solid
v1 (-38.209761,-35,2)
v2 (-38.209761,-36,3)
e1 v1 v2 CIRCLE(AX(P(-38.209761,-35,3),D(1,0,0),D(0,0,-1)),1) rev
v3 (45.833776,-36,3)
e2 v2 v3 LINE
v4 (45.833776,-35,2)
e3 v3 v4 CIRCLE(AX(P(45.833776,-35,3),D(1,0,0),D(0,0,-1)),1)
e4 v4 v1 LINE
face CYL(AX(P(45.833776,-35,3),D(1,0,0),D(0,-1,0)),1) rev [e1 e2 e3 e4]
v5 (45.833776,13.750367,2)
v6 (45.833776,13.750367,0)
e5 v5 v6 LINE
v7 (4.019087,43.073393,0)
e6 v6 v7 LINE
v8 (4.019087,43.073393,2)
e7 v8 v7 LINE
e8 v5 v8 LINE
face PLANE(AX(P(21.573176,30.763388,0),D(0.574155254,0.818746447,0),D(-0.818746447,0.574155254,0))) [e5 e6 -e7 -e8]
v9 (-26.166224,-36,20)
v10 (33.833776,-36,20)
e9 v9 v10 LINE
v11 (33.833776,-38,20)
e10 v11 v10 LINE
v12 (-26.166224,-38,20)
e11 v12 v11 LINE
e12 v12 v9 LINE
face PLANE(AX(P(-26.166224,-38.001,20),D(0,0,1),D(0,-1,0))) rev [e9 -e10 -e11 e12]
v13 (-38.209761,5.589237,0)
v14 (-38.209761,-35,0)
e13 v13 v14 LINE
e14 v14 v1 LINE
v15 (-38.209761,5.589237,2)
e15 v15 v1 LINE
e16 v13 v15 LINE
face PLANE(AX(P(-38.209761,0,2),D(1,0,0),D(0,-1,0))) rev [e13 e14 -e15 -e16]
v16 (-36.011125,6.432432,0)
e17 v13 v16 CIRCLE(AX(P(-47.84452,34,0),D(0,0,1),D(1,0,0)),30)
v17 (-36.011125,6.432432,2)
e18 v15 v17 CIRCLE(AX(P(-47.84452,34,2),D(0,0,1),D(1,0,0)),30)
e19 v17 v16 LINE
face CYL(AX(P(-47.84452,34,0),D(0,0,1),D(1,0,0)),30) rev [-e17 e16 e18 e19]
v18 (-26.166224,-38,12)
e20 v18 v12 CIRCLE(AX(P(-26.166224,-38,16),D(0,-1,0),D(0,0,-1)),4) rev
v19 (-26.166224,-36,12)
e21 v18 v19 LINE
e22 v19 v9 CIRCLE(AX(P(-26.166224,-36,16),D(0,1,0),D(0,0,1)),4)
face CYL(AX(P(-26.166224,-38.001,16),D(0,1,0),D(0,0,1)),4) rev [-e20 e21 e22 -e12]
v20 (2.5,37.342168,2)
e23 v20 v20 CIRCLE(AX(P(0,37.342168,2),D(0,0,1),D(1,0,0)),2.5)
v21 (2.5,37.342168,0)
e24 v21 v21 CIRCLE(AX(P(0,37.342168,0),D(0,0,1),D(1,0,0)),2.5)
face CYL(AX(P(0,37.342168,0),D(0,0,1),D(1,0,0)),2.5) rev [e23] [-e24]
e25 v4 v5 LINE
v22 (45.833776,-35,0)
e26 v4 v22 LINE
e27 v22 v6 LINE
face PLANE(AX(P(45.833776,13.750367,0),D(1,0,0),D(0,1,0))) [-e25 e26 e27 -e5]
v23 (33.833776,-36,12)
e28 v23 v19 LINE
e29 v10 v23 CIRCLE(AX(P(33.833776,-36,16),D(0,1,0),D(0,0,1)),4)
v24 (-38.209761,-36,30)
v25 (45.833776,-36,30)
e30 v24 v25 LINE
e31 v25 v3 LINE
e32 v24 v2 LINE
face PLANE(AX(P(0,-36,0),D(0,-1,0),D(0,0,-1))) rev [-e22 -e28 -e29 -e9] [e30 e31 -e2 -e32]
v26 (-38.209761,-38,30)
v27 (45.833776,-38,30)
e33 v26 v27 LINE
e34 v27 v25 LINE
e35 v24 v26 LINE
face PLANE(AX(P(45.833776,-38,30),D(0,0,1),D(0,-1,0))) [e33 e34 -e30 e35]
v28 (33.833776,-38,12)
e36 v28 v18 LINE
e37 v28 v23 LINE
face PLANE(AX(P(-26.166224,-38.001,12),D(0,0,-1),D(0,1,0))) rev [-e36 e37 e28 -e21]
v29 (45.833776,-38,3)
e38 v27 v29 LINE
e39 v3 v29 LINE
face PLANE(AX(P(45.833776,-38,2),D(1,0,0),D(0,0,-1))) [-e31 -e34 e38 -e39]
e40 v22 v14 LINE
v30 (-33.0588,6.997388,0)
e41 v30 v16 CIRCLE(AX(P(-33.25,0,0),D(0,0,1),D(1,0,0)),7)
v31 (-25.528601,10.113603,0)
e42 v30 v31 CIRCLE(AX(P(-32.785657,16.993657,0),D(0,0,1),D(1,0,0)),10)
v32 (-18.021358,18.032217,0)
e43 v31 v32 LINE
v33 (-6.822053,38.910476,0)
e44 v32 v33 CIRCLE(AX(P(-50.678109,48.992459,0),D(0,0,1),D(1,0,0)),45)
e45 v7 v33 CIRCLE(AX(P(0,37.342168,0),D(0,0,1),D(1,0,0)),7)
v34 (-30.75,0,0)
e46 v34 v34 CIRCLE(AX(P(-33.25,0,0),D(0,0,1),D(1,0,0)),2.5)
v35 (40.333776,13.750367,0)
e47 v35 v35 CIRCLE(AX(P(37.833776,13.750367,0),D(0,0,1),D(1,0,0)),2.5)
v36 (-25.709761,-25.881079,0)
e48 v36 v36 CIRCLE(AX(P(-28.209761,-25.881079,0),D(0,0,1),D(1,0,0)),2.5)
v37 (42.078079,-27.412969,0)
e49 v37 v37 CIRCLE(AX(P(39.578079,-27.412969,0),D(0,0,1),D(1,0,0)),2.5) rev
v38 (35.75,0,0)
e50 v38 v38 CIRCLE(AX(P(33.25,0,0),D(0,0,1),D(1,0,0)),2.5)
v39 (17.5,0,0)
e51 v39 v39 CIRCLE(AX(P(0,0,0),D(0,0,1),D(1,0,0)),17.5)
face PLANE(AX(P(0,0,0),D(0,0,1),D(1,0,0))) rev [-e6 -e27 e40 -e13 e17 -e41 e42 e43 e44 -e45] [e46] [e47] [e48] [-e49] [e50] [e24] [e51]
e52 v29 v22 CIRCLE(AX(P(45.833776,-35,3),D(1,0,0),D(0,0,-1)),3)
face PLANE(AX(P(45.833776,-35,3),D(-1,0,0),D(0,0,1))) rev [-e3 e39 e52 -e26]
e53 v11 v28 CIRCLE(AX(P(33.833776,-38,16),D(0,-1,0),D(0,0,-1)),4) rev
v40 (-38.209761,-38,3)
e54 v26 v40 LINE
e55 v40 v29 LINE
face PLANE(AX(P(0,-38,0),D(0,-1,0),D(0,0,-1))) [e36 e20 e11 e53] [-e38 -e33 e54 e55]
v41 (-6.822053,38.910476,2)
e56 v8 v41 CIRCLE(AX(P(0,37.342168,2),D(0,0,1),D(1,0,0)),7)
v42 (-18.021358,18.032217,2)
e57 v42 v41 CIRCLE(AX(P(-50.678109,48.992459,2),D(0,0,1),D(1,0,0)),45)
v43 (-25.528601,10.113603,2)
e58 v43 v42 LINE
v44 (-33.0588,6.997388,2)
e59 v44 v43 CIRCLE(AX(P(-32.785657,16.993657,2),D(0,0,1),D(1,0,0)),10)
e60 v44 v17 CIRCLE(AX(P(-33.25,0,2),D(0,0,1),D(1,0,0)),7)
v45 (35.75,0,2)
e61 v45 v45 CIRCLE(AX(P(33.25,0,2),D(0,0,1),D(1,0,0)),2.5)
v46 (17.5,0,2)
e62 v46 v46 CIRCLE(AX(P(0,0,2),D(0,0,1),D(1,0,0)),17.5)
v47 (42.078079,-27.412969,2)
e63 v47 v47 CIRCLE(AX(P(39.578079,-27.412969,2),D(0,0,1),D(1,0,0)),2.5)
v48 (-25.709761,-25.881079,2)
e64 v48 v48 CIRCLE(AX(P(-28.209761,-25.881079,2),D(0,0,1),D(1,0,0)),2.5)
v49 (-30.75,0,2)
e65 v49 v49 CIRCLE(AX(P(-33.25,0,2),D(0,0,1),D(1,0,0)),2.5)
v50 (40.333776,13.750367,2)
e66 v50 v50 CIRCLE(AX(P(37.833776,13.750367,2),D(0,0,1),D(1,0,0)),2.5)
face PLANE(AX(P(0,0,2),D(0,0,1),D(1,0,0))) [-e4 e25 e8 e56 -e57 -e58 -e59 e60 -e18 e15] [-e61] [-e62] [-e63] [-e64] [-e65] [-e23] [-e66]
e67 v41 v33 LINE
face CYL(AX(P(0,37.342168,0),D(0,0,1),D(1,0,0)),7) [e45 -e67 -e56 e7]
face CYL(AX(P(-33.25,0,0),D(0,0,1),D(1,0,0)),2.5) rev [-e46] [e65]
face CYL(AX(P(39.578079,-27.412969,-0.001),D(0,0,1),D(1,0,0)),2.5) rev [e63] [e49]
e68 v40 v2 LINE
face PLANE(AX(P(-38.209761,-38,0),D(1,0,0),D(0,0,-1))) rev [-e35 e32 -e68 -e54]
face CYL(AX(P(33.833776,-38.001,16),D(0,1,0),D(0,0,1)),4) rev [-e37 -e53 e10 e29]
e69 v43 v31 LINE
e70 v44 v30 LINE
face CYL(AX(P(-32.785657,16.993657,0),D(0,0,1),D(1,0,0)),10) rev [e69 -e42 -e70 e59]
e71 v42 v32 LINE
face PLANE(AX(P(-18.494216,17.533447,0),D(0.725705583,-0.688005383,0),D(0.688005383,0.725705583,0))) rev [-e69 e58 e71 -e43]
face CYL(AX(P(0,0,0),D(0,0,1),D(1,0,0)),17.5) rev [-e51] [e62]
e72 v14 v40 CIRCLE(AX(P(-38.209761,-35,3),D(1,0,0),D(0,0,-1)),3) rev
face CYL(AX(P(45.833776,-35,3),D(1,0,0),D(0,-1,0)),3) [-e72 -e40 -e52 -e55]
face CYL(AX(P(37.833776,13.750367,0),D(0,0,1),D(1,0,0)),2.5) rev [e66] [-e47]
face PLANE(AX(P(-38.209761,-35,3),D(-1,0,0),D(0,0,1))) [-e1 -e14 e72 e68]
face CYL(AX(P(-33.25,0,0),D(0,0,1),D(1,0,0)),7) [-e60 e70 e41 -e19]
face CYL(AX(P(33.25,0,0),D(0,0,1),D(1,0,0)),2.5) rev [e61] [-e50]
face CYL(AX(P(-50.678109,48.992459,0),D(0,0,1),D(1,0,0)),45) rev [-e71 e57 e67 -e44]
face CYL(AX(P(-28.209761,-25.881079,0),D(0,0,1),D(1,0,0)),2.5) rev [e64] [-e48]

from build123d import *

# Parameters (mm, degrees)
SKETCH1_R                  = 2.138138955
SKETCH1_R_2                = 2.5
SKETCH1_R_3                = 17.5
BOSS_EXTRUDE1_DEPTH        = 4
FILLET4_R                  = 10
FILLET8_R                  = 30
SKETCH2_R                  = 2
BOSS_EXTRUDE2_DEPTH        = 4
FILLET10_R                 = 4
SKETCH3_R                  = 2.5
SKETCH3_R_2                = 2.138138955
BOSS_EXTRUDE3_DEPTH        = 4
SKETCH4_W                  = 172.930913202
SKETCH4_H                  = 8.75
BOSS_EXTRUDE4_DEPTH        = 4
CUT_EXTRUDE1_REACH         = 123.687
CONVERT_SOLID1_START       = 2
CONVERT_SOLID1_OUTLINE_R   = 2.138138955
CONVERT_SOLID1_OUTLINE_R_2 = 2.5
CONVERT_SOLID1_OUTLINE_R_3 = 17.5
CONVERT_SOLID1_OUTLINE_R_4 = 2
CONVERT_SOLID1_DEPTH       = 2
EDGE_FLANGE1_DEPTH         = 159.04353712
CUT_EXTRUDE2_REACH         = 144.058
CUT_EXTRUDE3_REACH         = 126.803
SKETCH15_R                 = 2.5
CUT_EXTRUDE4_DEPTH         = 126.266876508
CUT_EXTRUDE4_DEPTH_BACK    = 126.266876508
SKETCH16_W                 = 75
SKETCH16_H                 = 51.529180682
SKETCH17_R                 = 2.5
CUT_EXTRUDE5_DEPTH         = 70.648854106


# Read off the part's stored shape, not the designer's step: Convert-Solid1
# Sheet-metal steps are written as plain solids
with BuildPart() as part:
    # Sketch1 → Boss-Extrude1 (new body)
    with BuildSketch(Plane.XY):
        with BuildLine():
            Line((57.269086776, 5.73122513), (4.019086776, 43.073392983))
            ThreePointArc((4.019086776, 43.073392983), (-2.50930732, 43.876949929), (-6.822053045, 38.910476579))
            ThreePointArc((-6.822053045, 38.910476579), (-11.022997654, 27.721065982), (-18.021357649, 18.032216591))
            Line((-18.021357649, 18.032216591), (-29.508168792, 5.915969846))
            ThreePointArc((-29.508168792, 5.915969846), (-34.635809661, 6.861452586), (-38.994562647, 4))
            Line((-38.994562647, 4), (-49.854306759, 4))
            ThreePointArc((-49.854306759, 4), (-50.678108889, 3.992458813), (-51.501911019, 4))
            Line((-51.501911019, 4), (-103.25, 4))
            ThreePointArc((-103.25, 4), (-113.23757059, -5.501568758), (-104.245623443, -15.950313259))
            Line((-104.245623443, -15.950313259), (-2.613511537, -26.119572306))
            ThreePointArc((-2.613511537, -26.119572306), (3.534961315, -26.010892882), (9.48943662, -24.474743975))
            Line((9.48943662, -24.474743975), (55.780516432, -6.526598393))
            ThreePointArc((55.780516432, -6.526598393), (60.198948476, -0.84386911), (57.269086776, 5.73122513))
        make_face()
        with Locations((-93.25, -6)):
            Circle(SKETCH1_R, mode=Mode.SUBTRACT)
        with Locations((-69.427494877, -8.934369314)):
            Circle(SKETCH1_R_2, mode=Mode.SUBTRACT)
        with Locations((-43.206195341, -14.414354512)):
            Circle(SKETCH1_R_2, mode=Mode.SUBTRACT)
        with Locations((-33.25, 0)):
            Circle(SKETCH1_R_2, mode=Mode.SUBTRACT)
        Circle(SKETCH1_R_3, mode=Mode.SUBTRACT)
        with Locations((33.25, 0)):
            Circle(SKETCH1_R_2, mode=Mode.SUBTRACT)
        with Locations((53.25, 0)):
            Circle(SKETCH1_R_2, mode=Mode.SUBTRACT)
        with Locations((0, 37.342167854)):
            Circle(SKETCH1_R_2, mode=Mode.SUBTRACT)
    extrude(amount=BOSS_EXTRUDE1_DEPTH)

    # Fillet4
    fillet4_edges = [part.edges().sort_by_distance(p)[0] for p in [
        (-29.508168792, 5.915969846, 2),
    ]]
    fillet(fillet4_edges, radius=FILLET4_R)

    # Fillet8
    fillet8_edges = [part.edges().sort_by_distance(p)[0] for p in [
        (-38.994562647, 4, 2),
    ]]
    fillet(fillet8_edges, radius=FILLET8_R)

    # Sketch2 → Boss-Extrude2 (add, through all)
    with BuildSketch(Plane(origin=(0, 0, 0), x_dir=(-1, 0, 0), z_dir=(0, 0, -1))):
        Polygon((113.243669527, -5.64423408), (112.561112682, 13.529180682), (98.666188695, 13.529180682), (98.666188695, 2.111142935), align=None)
        with Locations((105.421921095, 7.587030731)):
            Circle(SKETCH2_R, mode=Mode.SUBTRACT)
    extrude(amount=-BOSS_EXTRUDE2_DEPTH)

    # Fillet10
    fillet10_edges = [part.edges().sort_by_distance(p)[0] for p in [
        (-98.666188695, 4, 2),
        (-98.666188695, 13.529180682, 2),
        (-112.561112682, 13.529180682, 2),
    ]]
    fillet(fillet10_edges, radius=FILLET10_R)

    # Sketch3 → Boss-Extrude3 (add)
    # profile 1 of 4: a face of its own
    with BuildSketch(Plane(origin=(0, 0, 0), x_dir=(-1, 0, 0), z_dir=(0, 0, -1))):
        with BuildLine():
            Line((-59.721152147, -26.25), (0, -26.25))
            ThreePointArc((0, -26.25), (-4.827031731, -25.802369362), (-9.48943662, -24.474743975))
            Line((-9.48943662, -24.474743975), (-55.780516432, -6.526598393))
            ThreePointArc((-55.780516432, -6.526598393), (-58.776157504, -4.296694455), (-60.198948476, -0.84386911))
            Line((-60.198948476, -0.84386911), (-59.721152147, -26.25))
        make_face()
    # profile 2 of 4: a face of its own
    with BuildSketch(Plane(origin=(0, 0, 0), x_dir=(-1, 0, 0), z_dir=(0, 0, -1))):
        with BuildLine():
            ThreePointArc((-9.48943662, -24.474743975), (-4.827031731, -25.802369362), (0, -26.25))
            Line((0, -26.25), (-50.316238181, 5.820300559))
            Line((-50.316238181, 5.820300559), (-60.198948476, -0.84386911))
            ThreePointArc((-60.198948476, -0.84386911), (-58.776157504, -4.296694455), (-55.780516432, -6.526598393))
            Line((-55.780516432, -6.526598393), (-9.48943662, -24.474743975))
        make_face()
        with Locations(Location((-53.25, 0, 0), (0, 0, 180))):
            Circle(SKETCH3_R, mode=Mode.SUBTRACT)
    # profile 3 of 4: a face of its own
    with BuildSketch(Plane(origin=(0, 0, 0), x_dir=(-1, 0, 0), z_dir=(0, 0, -1))):
        with BuildLine():
            Line((30.255475695, -5.847942527), (0, -26.25))
            ThreePointArc((0, -26.25), (1.30838201, -26.2173728), (2.613511537, -26.119572306))
            Line((2.613511537, -26.119572306), (104.245623443, -15.950313259))
            ThreePointArc((104.245623443, -15.950313259), (110.356292372, -13.0356669), (113.209761055, -6.896191789))
            Line((113.209761055, -6.896191789), (113.209761055, -4.69172559))
            Line((113.209761055, -4.69172559), (113.006516175, 1.017540127))
            Line((113.006516175, 1.017540127), (30.255475695, -5.847942527))
        make_face()
        with Locations(Location((43.206195341, -14.414354512, 0), (0, 0, 180))):
            Circle(SKETCH3_R, mode=Mode.SUBTRACT)
        with Locations(Location((69.427494877, -8.934369314, 0), (0, 0, 180))):
            Circle(SKETCH3_R, mode=Mode.SUBTRACT)
        with Locations(Location((93.25, -6, 0), (0, 0, 180))):
            Circle(SKETCH3_R_2, mode=Mode.SUBTRACT)
    # profile 4 of 4: a face of its own
    with BuildSketch(Plane(origin=(0, 0, 0), x_dir=(-1, 0, 0), z_dir=(0, 0, -1))):
        with BuildLine():
            ThreePointArc((2.613511537, -26.119572306), (1.30838201, -26.2173728), (0, -26.25))
            Line((0, -26.25), (113.209761055, -26.25))
            Line((113.209761055, -26.25), (113.209761055, -6.896191789))
            ThreePointArc((113.209761055, -6.896191789), (110.356292372, -13.0356669), (104.245623443, -15.950313259))
            Line((104.245623443, -15.950313259), (2.613511537, -26.119572306))
        make_face()
    extrude(amount=-BOSS_EXTRUDE3_DEPTH)

    # Sketch4 → Boss-Extrude4 (add)
    with BuildSketch(Plane(origin=(0, 0, 0), x_dir=(-1, 0, 0), z_dir=(0, 0, -1))):
        with Locations((26.744304454, -30.625)):
            Rectangle(SKETCH4_W, SKETCH4_H)
    extrude(amount=-BOSS_EXTRUDE4_DEPTH)

    # Sketch5 → Cut-Extrude1 (cut, up to next)
    with BuildSketch(Plane(origin=(0, 0, 0), x_dir=(-1, 0, 0), z_dir=(0, 0, -1)), mode=Mode.PRIVATE) as cut_extrude1_sk1:
        Polygon((-45.833776065, 13.750366764), (-45.833776065, -35), (-59.721152147, -35), (-65.850826746, 7.196032961), align=None)
    cut_extrude1_tool1 = extrude(cut_extrude1_sk1.sketch, amount=-CUT_EXTRUDE1_REACH, mode=Mode.PRIVATE) & part.part
    add(cut_extrude1_tool1.solids().sort_by_distance((54.242954, -10.781509, 0))[0], mode=Mode.SUBTRACT)

    # Convert-Solid1 outline → Convert-Solid1 (cut)
    with BuildSketch(Plane.XY.offset(CONVERT_SOLID1_START)):
        with BuildLine():
            ThreePointArc((-33.058799925, 6.997388265), (-34.565645358, 6.875251071), (-36.011125314, 6.432432432))
            ThreePointArc((-36.011125314, 6.432432432), (-41.804115022, 4.614399555), (-47.844519519, 4))
            Line((-47.844519519, 4), (-49.854306759, 4))
            ThreePointArc((-49.854306759, 4), (-50.678108889, 3.992458813), (-51.501911019, 4))
            Line((-51.501911019, 4), (-94.666188695, 4))
            ThreePointArc((-94.666188695, 4), (-97.49461582, 5.171572875), (-98.666188695, 8))
            Line((-98.666188695, 8), (-98.666188695, 9.529180682))
            ThreePointArc((-98.666188695, 9.529180682), (-99.837761571, 12.357607807), (-102.666188695, 13.529180682))
            Line((-102.666188695, 13.529180682), (-108.700975401, 13.529180682))
            ThreePointArc((-108.700975401, 13.529180682), (-111.478633995, 12.407481003), (-112.698443211, 9.67148705))
            Line((-112.698443211, 9.67148705), (-113.243669527, -5.64423408))
            ThreePointArc((-113.243669527, -5.64423408), (-113.246334204, -6.2707443), (-113.209761055, -6.896191789))
            Line((-113.209761055, -6.896191789), (-113.209761055, -35))
            Line((-113.209761055, -35), (45.833776065, -35))
            Line((45.833776065, -35), (45.833776065, 13.750366764))
            Line((45.833776065, 13.750366764), (4.019086776, 43.073392983))
            ThreePointArc((4.019086776, 43.073392983), (-2.509307476, 43.876949869), (-6.82205312, 38.910476252))
            ThreePointArc((-6.82205312, 38.910476252), (-11.022997734, 27.721065834), (-18.021357649, 18.032216591))
            Line((-18.021357649, 18.032216591), (-25.528601129, 10.113603388))
            ThreePointArc((-25.528601129, 10.113603388), (-28.96185533, 7.75360629), (-33.058799925, 6.997388265))
        make_face()
        with Locations((-93.25, -6)):
            Circle(CONVERT_SOLID1_OUTLINE_R, mode=Mode.SUBTRACT)
        with Locations((-69.427494877, -8.934369314)):
            Circle(CONVERT_SOLID1_OUTLINE_R_2, mode=Mode.SUBTRACT)
        with Locations((-43.206195341, -14.414354512)):
            Circle(CONVERT_SOLID1_OUTLINE_R_2, mode=Mode.SUBTRACT)
        with Locations((-33.25, 0)):
            Circle(CONVERT_SOLID1_OUTLINE_R_2, mode=Mode.SUBTRACT)
        Circle(CONVERT_SOLID1_OUTLINE_R_3, mode=Mode.SUBTRACT)
        with Locations((33.25, 0)):
            Circle(CONVERT_SOLID1_OUTLINE_R_2, mode=Mode.SUBTRACT)
        with Locations((-105.421921095, 7.587030731)):
            Circle(CONVERT_SOLID1_OUTLINE_R_4, mode=Mode.SUBTRACT)
        with Locations((0, 37.342167854)):
            Circle(CONVERT_SOLID1_OUTLINE_R_2, mode=Mode.SUBTRACT)
    extrude(amount=CONVERT_SOLID1_DEPTH, mode=Mode.SUBTRACT)

    # Edge-Flange1 section (across the edge) → Edge-Flange1 (add)
    with BuildSketch(Plane(origin=(-113.209761055, -36, 2), x_dir=(0, 1, 0), z_dir=(1, 0, 0))):
        with BuildLine():
            Line((-2, 1), (-2, 28))
            Line((-2, 28), (0, 28))
            Line((0, 28), (0, 1))
            ThreePointArc((0, 1), (0.292893219, 0.292893219), (1, 0))
            Line((1, 0), (1, -2))
            ThreePointArc((1, -2), (-1.121320344, -1.121320344), (-2, 1))
        make_face()
    extrude(amount=EDGE_FLANGE1_DEPTH)

    # Sketch14 → Cut-Extrude2 (cut, up to next)
    with BuildSketch(Plane(origin=(0, -36, 0), x_dir=(1, 0, 0), z_dir=(0, 1, 0)), mode=Mode.PRIVATE) as cut_extrude2_sk1:
        with BuildLine():
            Line((-26.166223935, -12), (33.833776065, -12))
            ThreePointArc((33.833776065, -12), (37.833776065, -16), (33.833776065, -20))
            Line((33.833776065, -20), (-26.166223935, -20))
            ThreePointArc((-26.166223935, -20), (-30.166223935, -16), (-26.166223935, -12))
        make_face()
    cut_extrude2_tool1 = extrude(cut_extrude2_sk1.sketch, amount=-CUT_EXTRUDE2_REACH, mode=Mode.PRIVATE) & part.part
    add(cut_extrude2_tool1.solids().sort_by_distance((3.833776, -36, 16))[0], mode=Mode.SUBTRACT)

    # Sketch15 → Cut-Extrude3 (cut, up to next)
    with BuildSketch(Plane.XY.offset(2), mode=Mode.PRIVATE) as cut_extrude3_sk1:
        with Locations((-105.421921095, 7.587030731)):
            Circle(SKETCH15_R)
    cut_extrude3_tool1 = extrude(cut_extrude3_sk1.sketch, amount=-CUT_EXTRUDE3_REACH, mode=Mode.PRIVATE) & part.part
    # Sketch15 → Cut-Extrude3 (cut, up to next)
    with BuildSketch(Plane.XY.offset(2), mode=Mode.PRIVATE) as cut_extrude3_sk2:
        with Locations((-105.421921095, -27.412969269)):
            Circle(SKETCH15_R)
    cut_extrude3_tool2 = extrude(cut_extrude3_sk2.sketch, amount=-CUT_EXTRUDE3_REACH, mode=Mode.PRIVATE) & part.part
    # Sketch15 → Cut-Extrude3 (cut, up to next)
    with BuildSketch(Plane.XY.offset(2), mode=Mode.PRIVATE) as cut_extrude3_sk3:
        with Locations((39.578078905, -27.412969269)):
            Circle(SKETCH15_R)
    cut_extrude3_tool3 = extrude(cut_extrude3_sk3.sketch, amount=-CUT_EXTRUDE3_REACH, mode=Mode.PRIVATE) & part.part
    add(cut_extrude3_tool1.solids().sort_by_distance((-105.421921, 7.587031, 2))[0], mode=Mode.SUBTRACT)
    add(cut_extrude3_tool2.solids().sort_by_distance((-105.421921, -27.412969, 2))[0], mode=Mode.SUBTRACT)
    add(cut_extrude3_tool3.solids().sort_by_distance((39.578079, -27.412969, 2))[0], mode=Mode.SUBTRACT)

    # Sketch16 → Cut-Extrude4 (cut, two sides: drawn at the far end of the back side and taken through both)
    with BuildSketch(Plane(origin=(0, 0, 0), x_dir=(-1, 0, 0), z_dir=(0, 0, -1)).offset(-CUT_EXTRUDE4_DEPTH_BACK)):
        with Locations((75.709761055, -12.235409659)):
            Rectangle(SKETCH16_W, SKETCH16_H)
    extrude(amount=CUT_EXTRUDE4_DEPTH + CUT_EXTRUDE4_DEPTH_BACK, mode=Mode.SUBTRACT)


with BuildPart() as cut_extrude4_kept_piece:
    # of the separate pieces the step leaves, the one the design keeps (cut_extrude4_pieces_kept)
    add(part.part.solids().sort_by_distance((-36.011125314, 6.432432432, 0))[0])

    # Sketch17 → Cut-Extrude5 (cut, through all)
    with BuildSketch(Plane.XY.offset(2)):
        with Locations((-28.209761055, -25.881079341)):
            Circle(SKETCH17_R)
        with Locations((37.833776065, 13.750366764)):
            Circle(SKETCH17_R)
    extrude(amount=-CUT_EXTRUDE5_DEPTH, mode=Mode.SUBTRACT)


solid = cut_extrude4_kept_piece.part
